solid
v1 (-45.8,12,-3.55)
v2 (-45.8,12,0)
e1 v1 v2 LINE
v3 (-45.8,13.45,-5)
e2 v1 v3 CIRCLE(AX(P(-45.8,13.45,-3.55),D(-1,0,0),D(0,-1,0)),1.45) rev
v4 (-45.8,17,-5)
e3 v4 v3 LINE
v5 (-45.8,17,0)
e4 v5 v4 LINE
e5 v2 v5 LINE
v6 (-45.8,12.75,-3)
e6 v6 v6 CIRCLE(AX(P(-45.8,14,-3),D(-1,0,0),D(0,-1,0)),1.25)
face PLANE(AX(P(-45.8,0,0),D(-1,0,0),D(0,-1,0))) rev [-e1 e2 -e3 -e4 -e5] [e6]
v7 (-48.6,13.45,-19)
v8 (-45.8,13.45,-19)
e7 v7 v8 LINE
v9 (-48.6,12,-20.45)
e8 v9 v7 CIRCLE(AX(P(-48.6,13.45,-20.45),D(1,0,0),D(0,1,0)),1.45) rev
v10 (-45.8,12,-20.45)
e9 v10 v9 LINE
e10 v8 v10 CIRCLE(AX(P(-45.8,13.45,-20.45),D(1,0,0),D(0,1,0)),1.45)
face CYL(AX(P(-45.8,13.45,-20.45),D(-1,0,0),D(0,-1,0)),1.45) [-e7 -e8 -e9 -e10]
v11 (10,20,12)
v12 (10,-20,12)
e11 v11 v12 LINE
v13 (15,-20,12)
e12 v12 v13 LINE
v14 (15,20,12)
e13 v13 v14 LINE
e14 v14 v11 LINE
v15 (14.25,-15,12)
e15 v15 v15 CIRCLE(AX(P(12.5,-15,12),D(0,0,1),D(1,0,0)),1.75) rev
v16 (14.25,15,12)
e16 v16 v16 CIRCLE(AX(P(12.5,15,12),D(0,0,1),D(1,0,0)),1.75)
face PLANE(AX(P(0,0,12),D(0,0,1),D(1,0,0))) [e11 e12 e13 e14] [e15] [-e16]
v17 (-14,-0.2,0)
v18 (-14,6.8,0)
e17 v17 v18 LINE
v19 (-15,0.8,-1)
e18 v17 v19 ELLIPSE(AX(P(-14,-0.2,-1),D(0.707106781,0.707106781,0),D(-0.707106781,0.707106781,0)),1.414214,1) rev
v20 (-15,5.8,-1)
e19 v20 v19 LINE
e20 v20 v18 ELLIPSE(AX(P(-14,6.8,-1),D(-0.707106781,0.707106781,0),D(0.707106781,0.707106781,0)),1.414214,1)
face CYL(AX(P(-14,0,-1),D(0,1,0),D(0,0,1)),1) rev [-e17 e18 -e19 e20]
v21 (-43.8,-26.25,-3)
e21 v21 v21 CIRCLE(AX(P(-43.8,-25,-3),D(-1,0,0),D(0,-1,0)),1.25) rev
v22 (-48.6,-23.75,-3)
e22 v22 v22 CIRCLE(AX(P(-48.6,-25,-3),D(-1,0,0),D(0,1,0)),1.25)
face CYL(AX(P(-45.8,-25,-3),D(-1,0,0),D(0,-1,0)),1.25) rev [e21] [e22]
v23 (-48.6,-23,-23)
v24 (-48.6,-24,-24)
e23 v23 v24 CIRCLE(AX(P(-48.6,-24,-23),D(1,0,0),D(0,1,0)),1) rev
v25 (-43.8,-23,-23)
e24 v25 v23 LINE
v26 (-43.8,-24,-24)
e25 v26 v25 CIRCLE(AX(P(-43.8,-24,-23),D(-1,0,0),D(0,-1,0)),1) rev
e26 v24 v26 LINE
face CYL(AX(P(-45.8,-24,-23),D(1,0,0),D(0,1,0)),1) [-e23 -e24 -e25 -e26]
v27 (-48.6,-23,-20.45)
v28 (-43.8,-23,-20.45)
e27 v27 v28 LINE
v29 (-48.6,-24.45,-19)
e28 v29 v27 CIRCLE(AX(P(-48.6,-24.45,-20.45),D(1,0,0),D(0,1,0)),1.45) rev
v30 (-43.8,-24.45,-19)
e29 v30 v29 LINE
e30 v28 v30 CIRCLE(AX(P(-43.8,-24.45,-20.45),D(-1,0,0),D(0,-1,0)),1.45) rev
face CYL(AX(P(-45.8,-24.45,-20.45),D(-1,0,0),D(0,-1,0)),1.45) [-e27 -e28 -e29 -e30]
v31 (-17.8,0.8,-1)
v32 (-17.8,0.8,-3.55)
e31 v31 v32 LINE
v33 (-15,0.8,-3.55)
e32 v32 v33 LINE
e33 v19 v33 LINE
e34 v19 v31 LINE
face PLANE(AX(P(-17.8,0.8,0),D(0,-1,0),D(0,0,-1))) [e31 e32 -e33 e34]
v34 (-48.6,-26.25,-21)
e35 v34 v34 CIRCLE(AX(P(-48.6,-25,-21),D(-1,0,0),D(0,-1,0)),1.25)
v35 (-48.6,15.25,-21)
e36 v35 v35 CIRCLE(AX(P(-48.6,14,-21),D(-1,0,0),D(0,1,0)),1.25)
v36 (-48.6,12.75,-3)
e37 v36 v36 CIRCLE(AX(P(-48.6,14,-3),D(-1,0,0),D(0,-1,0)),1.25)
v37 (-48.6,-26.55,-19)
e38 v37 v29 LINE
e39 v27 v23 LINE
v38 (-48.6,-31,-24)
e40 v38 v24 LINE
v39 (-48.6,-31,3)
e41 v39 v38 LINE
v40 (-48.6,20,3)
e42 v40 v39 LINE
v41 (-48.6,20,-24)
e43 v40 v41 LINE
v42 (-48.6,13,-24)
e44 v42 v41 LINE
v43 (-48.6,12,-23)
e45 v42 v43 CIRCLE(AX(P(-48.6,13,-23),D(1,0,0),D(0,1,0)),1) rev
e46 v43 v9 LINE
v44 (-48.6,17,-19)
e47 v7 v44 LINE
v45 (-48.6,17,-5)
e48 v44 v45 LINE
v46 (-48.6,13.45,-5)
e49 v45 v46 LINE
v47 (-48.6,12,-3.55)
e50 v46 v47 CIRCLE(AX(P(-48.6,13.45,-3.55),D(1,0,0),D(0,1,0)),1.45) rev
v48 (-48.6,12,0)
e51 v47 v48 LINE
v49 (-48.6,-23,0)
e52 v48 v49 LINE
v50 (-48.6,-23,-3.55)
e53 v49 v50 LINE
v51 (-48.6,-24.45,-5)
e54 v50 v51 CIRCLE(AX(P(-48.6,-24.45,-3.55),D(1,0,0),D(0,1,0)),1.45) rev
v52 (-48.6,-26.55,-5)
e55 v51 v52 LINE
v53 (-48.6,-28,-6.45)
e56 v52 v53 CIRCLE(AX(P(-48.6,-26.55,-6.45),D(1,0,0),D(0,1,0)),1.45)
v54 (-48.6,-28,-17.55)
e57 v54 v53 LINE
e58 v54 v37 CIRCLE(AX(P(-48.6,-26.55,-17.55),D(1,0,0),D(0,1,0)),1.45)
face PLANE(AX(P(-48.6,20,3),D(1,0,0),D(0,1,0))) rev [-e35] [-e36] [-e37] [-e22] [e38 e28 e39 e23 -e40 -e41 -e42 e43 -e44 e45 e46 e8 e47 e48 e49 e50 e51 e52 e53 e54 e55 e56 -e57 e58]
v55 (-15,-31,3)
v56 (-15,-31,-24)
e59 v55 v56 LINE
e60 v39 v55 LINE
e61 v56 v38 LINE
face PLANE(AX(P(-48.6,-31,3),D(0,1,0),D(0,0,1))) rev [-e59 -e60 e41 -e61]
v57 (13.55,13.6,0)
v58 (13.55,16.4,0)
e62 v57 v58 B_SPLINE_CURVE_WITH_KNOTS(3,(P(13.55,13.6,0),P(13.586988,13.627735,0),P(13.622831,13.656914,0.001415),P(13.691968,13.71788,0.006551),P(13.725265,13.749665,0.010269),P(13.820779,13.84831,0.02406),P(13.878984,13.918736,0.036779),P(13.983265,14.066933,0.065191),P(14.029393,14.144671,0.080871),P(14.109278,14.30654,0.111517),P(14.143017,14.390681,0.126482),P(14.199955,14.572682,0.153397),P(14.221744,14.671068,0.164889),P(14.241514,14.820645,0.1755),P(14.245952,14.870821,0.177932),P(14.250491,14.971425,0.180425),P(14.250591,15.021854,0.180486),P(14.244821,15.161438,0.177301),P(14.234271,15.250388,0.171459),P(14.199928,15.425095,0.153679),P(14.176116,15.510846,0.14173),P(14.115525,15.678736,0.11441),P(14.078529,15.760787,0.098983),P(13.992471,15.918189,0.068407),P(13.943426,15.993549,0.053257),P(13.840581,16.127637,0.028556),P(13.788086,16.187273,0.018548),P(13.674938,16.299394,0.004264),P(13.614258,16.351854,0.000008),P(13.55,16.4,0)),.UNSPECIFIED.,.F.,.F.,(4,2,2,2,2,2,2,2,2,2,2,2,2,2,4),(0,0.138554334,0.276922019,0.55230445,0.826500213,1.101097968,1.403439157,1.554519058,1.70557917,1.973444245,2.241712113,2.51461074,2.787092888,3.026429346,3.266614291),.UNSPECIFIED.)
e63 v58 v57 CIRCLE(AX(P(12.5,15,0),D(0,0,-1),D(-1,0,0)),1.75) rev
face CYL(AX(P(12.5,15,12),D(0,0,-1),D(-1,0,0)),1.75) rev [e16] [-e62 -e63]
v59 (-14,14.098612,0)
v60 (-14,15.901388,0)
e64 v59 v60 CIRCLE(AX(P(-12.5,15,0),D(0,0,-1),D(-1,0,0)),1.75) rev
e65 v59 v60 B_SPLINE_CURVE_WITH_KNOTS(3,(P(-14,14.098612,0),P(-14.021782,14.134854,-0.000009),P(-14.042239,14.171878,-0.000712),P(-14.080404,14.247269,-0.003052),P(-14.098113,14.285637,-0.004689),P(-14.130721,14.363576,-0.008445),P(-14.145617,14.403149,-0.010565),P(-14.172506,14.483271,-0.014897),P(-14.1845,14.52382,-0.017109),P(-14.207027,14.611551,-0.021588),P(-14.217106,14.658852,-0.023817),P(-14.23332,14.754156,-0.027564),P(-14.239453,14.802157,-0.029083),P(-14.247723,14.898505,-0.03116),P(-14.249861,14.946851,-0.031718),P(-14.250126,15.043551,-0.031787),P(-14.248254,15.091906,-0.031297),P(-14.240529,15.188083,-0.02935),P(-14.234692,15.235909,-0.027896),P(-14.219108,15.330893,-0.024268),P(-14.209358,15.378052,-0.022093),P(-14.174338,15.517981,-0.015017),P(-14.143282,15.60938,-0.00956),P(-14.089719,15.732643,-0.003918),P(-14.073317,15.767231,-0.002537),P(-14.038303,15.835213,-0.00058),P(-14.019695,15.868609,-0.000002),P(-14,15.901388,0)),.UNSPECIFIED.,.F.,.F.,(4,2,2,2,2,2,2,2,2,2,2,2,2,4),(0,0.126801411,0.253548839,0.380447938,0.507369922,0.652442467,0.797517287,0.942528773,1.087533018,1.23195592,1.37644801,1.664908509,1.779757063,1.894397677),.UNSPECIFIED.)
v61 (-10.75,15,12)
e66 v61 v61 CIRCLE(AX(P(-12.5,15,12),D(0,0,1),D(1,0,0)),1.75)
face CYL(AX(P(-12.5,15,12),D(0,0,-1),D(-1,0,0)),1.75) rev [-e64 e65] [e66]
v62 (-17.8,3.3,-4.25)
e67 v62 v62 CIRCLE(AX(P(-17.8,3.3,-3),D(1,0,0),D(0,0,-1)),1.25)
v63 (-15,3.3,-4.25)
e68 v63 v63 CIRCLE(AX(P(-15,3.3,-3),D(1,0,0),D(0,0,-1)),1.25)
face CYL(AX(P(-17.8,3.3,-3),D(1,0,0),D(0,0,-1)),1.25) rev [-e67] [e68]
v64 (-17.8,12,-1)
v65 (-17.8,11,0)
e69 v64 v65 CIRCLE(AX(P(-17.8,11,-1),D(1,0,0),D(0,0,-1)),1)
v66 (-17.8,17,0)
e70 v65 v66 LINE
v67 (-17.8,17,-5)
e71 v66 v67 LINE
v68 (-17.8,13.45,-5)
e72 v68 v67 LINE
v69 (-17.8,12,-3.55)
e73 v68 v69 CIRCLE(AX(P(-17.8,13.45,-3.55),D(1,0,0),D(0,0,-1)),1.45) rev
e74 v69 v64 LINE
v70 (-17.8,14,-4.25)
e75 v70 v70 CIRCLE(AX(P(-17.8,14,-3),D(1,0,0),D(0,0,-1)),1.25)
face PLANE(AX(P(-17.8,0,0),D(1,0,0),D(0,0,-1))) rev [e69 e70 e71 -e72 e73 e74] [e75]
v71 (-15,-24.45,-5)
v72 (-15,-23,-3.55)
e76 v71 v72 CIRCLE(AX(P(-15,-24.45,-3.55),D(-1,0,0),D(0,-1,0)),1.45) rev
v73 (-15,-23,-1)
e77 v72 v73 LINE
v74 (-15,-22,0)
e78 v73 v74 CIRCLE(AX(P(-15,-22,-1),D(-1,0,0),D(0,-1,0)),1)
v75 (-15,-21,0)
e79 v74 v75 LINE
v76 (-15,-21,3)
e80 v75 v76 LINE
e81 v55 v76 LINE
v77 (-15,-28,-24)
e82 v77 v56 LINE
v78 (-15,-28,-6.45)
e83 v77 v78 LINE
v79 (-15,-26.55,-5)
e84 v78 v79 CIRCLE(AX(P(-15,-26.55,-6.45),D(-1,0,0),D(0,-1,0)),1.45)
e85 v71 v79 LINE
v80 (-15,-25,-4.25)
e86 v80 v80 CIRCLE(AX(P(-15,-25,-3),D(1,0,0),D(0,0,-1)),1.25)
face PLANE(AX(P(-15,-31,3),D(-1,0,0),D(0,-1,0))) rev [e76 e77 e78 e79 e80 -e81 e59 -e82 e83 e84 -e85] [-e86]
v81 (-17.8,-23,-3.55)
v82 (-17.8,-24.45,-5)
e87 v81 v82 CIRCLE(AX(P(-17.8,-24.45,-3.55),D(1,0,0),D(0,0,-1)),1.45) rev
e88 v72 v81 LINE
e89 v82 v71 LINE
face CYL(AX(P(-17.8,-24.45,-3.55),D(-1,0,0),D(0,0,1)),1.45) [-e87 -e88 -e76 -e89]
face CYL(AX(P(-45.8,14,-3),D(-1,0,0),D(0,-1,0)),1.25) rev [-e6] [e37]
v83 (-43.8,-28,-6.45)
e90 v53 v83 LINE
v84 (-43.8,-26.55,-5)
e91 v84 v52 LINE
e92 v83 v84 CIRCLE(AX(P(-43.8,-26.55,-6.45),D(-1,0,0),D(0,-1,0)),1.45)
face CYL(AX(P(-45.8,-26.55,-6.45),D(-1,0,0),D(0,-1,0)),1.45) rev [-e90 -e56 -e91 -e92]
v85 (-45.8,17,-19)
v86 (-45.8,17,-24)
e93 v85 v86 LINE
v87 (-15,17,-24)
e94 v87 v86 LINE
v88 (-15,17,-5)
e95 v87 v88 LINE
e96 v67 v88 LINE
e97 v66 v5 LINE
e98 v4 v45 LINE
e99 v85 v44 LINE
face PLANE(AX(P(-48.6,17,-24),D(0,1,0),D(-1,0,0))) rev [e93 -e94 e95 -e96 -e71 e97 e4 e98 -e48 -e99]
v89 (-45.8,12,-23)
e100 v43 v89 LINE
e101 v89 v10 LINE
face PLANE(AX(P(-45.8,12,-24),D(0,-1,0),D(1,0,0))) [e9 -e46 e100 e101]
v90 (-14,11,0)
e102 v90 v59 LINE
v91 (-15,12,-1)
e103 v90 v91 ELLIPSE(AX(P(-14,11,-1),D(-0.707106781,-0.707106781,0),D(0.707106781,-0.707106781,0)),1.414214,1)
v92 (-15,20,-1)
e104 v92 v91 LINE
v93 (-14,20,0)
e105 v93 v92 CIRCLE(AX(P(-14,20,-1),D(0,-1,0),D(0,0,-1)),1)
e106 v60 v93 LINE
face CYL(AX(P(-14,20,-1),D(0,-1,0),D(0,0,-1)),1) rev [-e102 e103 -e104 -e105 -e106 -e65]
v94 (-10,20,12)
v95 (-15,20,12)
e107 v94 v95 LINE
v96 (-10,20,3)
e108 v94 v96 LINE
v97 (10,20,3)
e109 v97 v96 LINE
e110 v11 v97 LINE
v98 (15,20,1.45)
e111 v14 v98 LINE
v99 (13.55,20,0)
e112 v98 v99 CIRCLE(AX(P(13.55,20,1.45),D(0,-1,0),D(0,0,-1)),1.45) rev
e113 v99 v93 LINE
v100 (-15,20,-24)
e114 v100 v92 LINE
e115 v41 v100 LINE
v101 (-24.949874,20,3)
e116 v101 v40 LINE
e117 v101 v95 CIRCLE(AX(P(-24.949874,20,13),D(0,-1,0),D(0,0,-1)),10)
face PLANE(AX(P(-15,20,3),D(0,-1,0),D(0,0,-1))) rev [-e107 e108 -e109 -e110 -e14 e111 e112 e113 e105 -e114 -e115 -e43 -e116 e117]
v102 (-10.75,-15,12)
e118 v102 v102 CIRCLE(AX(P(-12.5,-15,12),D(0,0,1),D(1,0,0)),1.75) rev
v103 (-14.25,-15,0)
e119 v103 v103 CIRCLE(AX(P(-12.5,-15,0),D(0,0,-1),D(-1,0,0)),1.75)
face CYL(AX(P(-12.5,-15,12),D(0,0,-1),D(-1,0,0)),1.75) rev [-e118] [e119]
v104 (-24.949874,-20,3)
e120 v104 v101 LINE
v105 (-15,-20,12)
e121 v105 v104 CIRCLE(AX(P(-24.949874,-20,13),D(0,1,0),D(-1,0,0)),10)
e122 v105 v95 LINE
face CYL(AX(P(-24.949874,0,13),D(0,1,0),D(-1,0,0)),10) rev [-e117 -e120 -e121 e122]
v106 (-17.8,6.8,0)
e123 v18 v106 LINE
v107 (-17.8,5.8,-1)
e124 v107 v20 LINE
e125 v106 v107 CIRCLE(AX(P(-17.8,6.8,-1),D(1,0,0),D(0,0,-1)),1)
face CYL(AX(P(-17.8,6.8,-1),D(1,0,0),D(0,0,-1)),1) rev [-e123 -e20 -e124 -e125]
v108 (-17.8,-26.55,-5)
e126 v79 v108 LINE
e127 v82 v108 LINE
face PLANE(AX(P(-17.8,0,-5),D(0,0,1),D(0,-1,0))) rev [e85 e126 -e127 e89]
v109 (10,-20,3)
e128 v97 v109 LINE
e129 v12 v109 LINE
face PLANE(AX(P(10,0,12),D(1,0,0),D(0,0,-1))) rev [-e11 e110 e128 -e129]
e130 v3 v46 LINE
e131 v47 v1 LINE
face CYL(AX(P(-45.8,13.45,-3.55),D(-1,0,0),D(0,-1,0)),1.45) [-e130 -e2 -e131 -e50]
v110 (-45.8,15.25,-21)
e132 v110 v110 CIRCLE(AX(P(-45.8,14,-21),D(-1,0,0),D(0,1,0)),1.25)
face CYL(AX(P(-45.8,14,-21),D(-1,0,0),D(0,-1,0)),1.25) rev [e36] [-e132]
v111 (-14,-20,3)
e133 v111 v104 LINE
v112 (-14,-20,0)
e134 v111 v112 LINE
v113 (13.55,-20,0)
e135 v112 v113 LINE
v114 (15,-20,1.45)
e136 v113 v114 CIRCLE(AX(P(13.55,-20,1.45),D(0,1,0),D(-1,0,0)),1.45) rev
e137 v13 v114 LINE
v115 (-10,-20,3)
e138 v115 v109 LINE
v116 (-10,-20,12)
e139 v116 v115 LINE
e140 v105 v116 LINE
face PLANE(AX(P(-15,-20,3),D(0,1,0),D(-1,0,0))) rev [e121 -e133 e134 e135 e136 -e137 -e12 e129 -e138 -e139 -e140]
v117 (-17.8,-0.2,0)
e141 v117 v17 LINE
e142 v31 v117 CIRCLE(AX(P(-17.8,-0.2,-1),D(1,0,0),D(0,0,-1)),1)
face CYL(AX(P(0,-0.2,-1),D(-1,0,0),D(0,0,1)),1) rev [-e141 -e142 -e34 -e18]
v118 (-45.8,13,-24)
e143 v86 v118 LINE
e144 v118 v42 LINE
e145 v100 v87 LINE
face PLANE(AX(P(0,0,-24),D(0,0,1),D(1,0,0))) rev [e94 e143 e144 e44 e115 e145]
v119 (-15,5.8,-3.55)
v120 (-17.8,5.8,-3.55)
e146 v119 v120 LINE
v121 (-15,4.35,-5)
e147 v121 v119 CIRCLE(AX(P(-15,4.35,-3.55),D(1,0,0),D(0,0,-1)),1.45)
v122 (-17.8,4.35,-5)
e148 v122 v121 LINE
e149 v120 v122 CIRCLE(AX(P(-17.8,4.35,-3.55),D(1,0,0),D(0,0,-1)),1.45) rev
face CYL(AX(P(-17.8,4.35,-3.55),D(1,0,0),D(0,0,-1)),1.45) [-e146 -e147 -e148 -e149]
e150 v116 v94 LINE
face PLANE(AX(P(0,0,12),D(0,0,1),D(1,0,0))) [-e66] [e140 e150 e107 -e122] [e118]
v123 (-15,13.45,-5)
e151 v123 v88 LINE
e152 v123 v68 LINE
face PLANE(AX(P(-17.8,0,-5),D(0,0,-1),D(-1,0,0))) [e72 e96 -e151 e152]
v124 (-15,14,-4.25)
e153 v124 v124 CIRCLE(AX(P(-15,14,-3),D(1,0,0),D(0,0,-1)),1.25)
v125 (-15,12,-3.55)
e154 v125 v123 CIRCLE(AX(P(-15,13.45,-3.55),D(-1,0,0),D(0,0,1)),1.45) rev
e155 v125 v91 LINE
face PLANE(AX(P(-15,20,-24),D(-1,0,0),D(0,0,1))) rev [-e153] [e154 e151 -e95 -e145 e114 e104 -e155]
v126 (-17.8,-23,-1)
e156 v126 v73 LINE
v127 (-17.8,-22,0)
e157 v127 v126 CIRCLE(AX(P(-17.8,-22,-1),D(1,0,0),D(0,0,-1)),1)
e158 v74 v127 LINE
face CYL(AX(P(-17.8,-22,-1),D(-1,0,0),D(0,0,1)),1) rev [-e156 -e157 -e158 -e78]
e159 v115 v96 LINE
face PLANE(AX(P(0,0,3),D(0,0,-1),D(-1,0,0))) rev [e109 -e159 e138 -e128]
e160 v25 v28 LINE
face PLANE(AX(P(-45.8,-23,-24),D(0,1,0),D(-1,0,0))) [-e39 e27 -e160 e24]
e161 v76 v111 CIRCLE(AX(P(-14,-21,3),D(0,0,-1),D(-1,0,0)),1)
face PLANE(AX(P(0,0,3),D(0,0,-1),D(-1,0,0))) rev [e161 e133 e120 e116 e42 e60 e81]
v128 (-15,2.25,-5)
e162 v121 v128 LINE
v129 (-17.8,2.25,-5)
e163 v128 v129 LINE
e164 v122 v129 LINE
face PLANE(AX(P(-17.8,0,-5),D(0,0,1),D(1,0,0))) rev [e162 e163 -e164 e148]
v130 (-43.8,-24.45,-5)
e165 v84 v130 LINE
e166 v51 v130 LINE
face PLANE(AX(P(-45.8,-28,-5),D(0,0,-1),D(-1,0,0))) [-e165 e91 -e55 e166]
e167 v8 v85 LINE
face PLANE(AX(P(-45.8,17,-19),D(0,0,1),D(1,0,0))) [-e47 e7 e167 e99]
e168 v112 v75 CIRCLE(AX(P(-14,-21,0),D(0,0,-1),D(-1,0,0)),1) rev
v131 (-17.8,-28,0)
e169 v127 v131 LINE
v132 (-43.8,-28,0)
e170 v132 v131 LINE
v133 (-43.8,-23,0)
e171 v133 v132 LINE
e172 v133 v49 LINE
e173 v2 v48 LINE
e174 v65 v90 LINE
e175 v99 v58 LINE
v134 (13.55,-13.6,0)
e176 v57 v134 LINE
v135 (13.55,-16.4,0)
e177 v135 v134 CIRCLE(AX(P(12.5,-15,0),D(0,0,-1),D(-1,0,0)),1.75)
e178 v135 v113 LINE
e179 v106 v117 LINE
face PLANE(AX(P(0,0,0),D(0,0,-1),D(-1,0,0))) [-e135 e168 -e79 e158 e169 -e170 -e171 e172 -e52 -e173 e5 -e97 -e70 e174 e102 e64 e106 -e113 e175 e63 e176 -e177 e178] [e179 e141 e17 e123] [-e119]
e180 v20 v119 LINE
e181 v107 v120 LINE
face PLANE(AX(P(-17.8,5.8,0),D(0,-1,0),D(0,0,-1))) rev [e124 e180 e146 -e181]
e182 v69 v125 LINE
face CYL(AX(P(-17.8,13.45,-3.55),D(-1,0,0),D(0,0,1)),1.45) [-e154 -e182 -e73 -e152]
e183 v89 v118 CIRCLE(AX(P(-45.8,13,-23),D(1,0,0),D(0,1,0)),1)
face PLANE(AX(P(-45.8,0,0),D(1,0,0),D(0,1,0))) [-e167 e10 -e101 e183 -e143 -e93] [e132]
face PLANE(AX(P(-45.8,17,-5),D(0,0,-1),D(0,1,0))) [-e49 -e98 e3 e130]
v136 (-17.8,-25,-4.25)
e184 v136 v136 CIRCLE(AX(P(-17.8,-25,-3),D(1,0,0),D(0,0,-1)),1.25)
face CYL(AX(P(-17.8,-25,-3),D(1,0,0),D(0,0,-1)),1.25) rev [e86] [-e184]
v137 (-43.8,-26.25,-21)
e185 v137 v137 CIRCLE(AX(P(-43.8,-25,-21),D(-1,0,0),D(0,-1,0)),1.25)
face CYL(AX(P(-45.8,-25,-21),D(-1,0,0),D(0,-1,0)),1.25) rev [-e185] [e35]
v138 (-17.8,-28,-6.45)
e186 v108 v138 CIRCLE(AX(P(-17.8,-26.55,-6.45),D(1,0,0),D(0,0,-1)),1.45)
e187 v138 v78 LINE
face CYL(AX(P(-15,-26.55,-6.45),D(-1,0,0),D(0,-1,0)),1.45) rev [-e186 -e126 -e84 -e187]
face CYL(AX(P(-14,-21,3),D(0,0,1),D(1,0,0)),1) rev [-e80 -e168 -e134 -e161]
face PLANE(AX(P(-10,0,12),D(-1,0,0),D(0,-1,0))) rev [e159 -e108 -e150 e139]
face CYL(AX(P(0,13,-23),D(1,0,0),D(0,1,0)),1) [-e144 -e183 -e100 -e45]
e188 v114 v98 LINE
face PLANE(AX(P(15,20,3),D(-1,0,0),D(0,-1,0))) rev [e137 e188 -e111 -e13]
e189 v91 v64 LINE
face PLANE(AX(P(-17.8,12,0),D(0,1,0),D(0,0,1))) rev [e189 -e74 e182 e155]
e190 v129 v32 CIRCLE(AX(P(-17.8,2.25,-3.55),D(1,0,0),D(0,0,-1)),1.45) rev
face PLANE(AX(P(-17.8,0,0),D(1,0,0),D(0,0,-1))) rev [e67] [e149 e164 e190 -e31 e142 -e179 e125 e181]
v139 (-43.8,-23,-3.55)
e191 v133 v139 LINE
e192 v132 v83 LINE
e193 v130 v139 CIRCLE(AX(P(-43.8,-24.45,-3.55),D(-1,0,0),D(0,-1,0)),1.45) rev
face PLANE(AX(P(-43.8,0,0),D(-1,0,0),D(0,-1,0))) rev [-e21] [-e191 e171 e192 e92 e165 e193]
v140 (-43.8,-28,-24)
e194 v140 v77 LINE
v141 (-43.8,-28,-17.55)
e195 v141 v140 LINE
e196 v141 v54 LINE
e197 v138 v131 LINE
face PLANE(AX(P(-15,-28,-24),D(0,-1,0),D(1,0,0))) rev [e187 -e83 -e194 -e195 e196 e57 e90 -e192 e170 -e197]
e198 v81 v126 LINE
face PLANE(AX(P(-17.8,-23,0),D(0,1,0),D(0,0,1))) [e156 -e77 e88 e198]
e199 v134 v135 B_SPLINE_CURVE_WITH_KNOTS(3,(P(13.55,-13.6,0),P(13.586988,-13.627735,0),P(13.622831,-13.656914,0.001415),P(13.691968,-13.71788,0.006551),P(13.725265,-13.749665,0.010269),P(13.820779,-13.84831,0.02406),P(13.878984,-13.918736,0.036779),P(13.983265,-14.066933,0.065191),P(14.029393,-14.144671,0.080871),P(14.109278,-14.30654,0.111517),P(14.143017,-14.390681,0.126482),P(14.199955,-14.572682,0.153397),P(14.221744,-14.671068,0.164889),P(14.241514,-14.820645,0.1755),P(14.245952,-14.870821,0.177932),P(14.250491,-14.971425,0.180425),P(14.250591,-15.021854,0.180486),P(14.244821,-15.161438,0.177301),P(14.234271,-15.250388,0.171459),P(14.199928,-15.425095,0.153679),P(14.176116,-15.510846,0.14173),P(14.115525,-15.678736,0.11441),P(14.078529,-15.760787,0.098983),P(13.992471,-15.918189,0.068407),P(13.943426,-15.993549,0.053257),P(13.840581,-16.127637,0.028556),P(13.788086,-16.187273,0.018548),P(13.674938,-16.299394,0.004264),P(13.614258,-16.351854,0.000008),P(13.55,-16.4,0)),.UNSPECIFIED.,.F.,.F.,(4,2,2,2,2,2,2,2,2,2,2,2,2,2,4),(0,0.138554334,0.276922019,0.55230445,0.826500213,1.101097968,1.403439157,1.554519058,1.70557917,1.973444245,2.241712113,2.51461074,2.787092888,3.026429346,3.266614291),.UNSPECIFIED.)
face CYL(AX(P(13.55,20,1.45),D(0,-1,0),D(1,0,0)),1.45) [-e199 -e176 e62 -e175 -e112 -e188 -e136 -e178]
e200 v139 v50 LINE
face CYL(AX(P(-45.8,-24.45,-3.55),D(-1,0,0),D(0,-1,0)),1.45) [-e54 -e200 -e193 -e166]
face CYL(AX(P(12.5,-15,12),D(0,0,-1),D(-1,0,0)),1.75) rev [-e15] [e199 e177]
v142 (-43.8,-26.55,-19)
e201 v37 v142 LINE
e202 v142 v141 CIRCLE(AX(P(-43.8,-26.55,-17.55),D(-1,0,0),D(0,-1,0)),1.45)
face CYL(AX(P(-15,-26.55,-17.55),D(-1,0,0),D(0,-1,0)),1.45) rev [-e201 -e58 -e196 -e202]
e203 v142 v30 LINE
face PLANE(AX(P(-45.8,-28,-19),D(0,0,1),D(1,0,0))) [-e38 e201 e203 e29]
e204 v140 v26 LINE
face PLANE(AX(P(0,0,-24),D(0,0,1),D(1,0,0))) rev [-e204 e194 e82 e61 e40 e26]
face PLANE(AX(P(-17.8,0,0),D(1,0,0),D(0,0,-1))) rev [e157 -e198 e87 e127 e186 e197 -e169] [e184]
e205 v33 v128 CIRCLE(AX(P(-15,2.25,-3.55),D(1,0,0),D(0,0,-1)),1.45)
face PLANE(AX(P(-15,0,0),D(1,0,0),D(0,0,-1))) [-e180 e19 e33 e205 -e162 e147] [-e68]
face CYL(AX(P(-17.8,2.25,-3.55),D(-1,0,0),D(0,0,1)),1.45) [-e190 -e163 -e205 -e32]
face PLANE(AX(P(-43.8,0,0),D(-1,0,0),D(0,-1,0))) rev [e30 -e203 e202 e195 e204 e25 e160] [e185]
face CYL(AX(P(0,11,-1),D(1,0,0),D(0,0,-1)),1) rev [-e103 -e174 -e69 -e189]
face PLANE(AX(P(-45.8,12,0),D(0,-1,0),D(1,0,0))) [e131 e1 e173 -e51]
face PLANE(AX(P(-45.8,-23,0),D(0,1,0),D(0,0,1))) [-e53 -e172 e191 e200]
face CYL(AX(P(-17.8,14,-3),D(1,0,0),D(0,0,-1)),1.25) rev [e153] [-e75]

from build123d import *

# Parameters (mm, degrees)
BOSS_EXTRU_1_DEPTH      = 3
ESQUISSE3_W             = 33.6
ESQUISSE3_H             = 3
BOSS_EXTRU_2_DEPTH      = 24
ESQUISSE4_W             = 5
ESQUISSE4_H             = 5
ESQUISSE4_R             = 1.25
BOSS_EXTRU_3_DEPTH      = 2.8
BOSS_EXTRU_4_START      = -2.8
ESQUISSE5_W             = 5
ESQUISSE5_H             = 5
ESQUISSE5_R             = 1.25
BOSS_EXTRU_4_DEPTH      = 2.8
ESQUISSE4_2_W           = 5
ESQUISSE4_2_H           = 5
ESQUISSE4_2_R           = 1.25
BOSS_EXTRU_5_DEPTH      = 4.8
ESQUISSE6_W             = 5
ESQUISSE6_H             = 40
ESQUISSE6_R             = 1.75
BOSS_EXTRU_6_DEPTH      = 9
CONG_3_R                = 10
CONG_4_R                = 1
CONG_1_R                = 1.45
CONG_2_R                = 1
ENL_V_MAT_EXTRU_1_REACH = 65.655
ESQUISSE6_3_R           = 1.75


with BuildPart() as part:
    # Esquisse1 → Boss.-Extru.1 (new body)
    with BuildSketch(Plane.XY):
        Polygon((-15, -20), (15, -20), (15, 20), (-15, 20), (-48.6, 20), (-48.6, -31), (-15, -31), align=None)
    extrude(amount=BOSS_EXTRU_1_DEPTH)

    # Esquisse3 → Boss.-Extru.2 (add)
    with BuildSketch(Plane(origin=(0, 0, 0), x_dir=(-1, 0, 0), z_dir=(0, 0, -1))):
        with Locations((31.8, -29.5)):
            Rectangle(ESQUISSE3_W, ESQUISSE3_H)
        with Locations((31.8, 18.5)):
            Rectangle(ESQUISSE3_W, ESQUISSE3_H)
    extrude(amount=BOSS_EXTRU_2_DEPTH)

    # Esquisse4 → Boss.-Extru.3 (add)
    # profile 1 of 4: a face of its own
    with BuildSketch(Plane.ZY.offset(48.6)):
        with Locations((-21.5, -25.5)):
            Rectangle(ESQUISSE4_W, ESQUISSE4_H)
        with Locations(Location((-21, -25, 0), (0, 0, 270))):
            Circle(ESQUISSE4_R, mode=Mode.SUBTRACT)
    # profile 2 of 4: a face of its own
    with BuildSketch(Plane.ZY.offset(48.6)):
        with Locations((-2.5, -25.5)):
            Rectangle(ESQUISSE4_W, ESQUISSE4_H)
        with Locations(Location((-3, -25, 0), (0, 0, 90))):
            Circle(ESQUISSE4_R, mode=Mode.SUBTRACT)
    # profile 3 of 4: a face of its own
    with BuildSketch(Plane.ZY.offset(48.6)):
        with Locations((-2.5, 14.5)):
            Rectangle(ESQUISSE4_W, ESQUISSE4_H)
        with Locations(Location((-3, 14, 0), (0, 0, 270))):
            Circle(ESQUISSE4_R, mode=Mode.SUBTRACT)
    # profile 4 of 4: a face of its own
    with BuildSketch(Plane.ZY.offset(48.6)):
        with Locations((-21.5, 14.5)):
            Rectangle(ESQUISSE4_W, ESQUISSE4_H)
        with Locations(Location((-21, 14, 0), (0, 0, 90))):
            Circle(ESQUISSE4_R, mode=Mode.SUBTRACT)
    extrude(amount=-BOSS_EXTRU_3_DEPTH)

    # Esquisse5 → Boss.-Extru.4 (add)
    # profile 1 of 3: a face of its own
    with BuildSketch(Plane(origin=(-15, 0, 0), x_dir=(0, 0, -1), z_dir=(1, 0, 0)).offset(BOSS_EXTRU_4_START)):
        with Locations((2.5, -25.5)):
            Rectangle(ESQUISSE5_W, ESQUISSE5_H)
        with Locations(Location((3, -25, 0), (0, 0, 90))):
            Circle(ESQUISSE5_R, mode=Mode.SUBTRACT)
    # profile 2 of 3: a face of its own
    with BuildSketch(Plane(origin=(-15, 0, 0), x_dir=(0, 0, -1), z_dir=(1, 0, 0)).offset(BOSS_EXTRU_4_START)):
        with Locations((2.5, 14.5)):
            Rectangle(ESQUISSE5_W, ESQUISSE5_H)
        with Locations(Location((3, 14, 0), (0, 0, 270))):
            Circle(ESQUISSE5_R, mode=Mode.SUBTRACT)
    # profile 3 of 3: a face of its own
    with BuildSketch(Plane(origin=(-15, 0, 0), x_dir=(0, 0, -1), z_dir=(1, 0, 0)).offset(BOSS_EXTRU_4_START)):
        with Locations((2.5, 3.3)):
            Rectangle(ESQUISSE5_W, ESQUISSE5_H)
        with Locations((3, 3.3)):
            Circle(ESQUISSE5_R, mode=Mode.SUBTRACT)
    extrude(amount=BOSS_EXTRU_4_DEPTH)

    # Esquisse4<2> → Boss.-Extru.5 (add)
    # profile 1 of 2: a face of its own
    with BuildSketch(Plane.ZY.offset(48.6)):
        with Locations((-21.5, -25.5)):
            Rectangle(ESQUISSE4_2_W, ESQUISSE4_2_H)
        with Locations(Location((-21, -25, 0), (0, 0, 270))):
            Circle(ESQUISSE4_2_R, mode=Mode.SUBTRACT)
    # profile 2 of 2: a face of its own
    with BuildSketch(Plane.ZY.offset(48.6)):
        with Locations((-2.5, -25.5)):
            Rectangle(ESQUISSE4_2_W, ESQUISSE4_2_H)
        with Locations(Location((-3, -25, 0), (0, 0, 270))):
            Circle(ESQUISSE4_2_R, mode=Mode.SUBTRACT)
    extrude(amount=-BOSS_EXTRU_5_DEPTH)

    # Esquisse6 → Boss.-Extru.6 (add)
    # profile 1 of 2: a face of its own
    with BuildSketch(Plane.XY.offset(3)):
        with Locations((12.5, 0)):
            Rectangle(ESQUISSE6_W, ESQUISSE6_H)
        with Locations(Location((12.5, -15, 0), (0, 0, 180))):
            Circle(ESQUISSE6_R, mode=Mode.SUBTRACT)
        with Locations((12.5, 15)):
            Circle(ESQUISSE6_R, mode=Mode.SUBTRACT)
    # profile 2 of 2: a face of its own
    with BuildSketch(Plane.XY.offset(3)):
        with Locations((-12.5, 0)):
            Rectangle(ESQUISSE6_W, ESQUISSE6_H)
        with Locations((-12.5, -15)):
            Circle(ESQUISSE6_R, mode=Mode.SUBTRACT)
        with Locations((-12.5, 15)):
            Circle(ESQUISSE6_R, mode=Mode.SUBTRACT)
    extrude(amount=BOSS_EXTRU_6_DEPTH)

    # Congé3
    # the kernel refuses this fillet: 10 mm, written as the material it adds along each edge
    with BuildSketch(Plane(origin=(-15, 20, 3), x_dir=(-1, 0, 0), z_dir=(0, -1, 0))) as cong_3_piece_1:
        with BuildLine():
            CenterArc((9.949874371, -10), CONG_3_R, 90, 84.260829523)
            Line((0, -9), (0, 0))
            Line((0, 0), (9.949874371, 0))
        make_face()
    extrude(amount=40)

    # Congé4
    # the kernel refuses this fillet: 1 mm, written as the material it adds along each edge
    with BuildSketch(Plane(origin=(-15, -20, 0), x_dir=(1, 0, 0), z_dir=(0, 0, 1))) as cong_4_piece_1:
        with BuildLine():
            CenterArc((CONG_4_R, -CONG_4_R), CONG_4_R, 90, 90)
            Line((0, -CONG_4_R), (0, 0))
            Line((0, 0), (CONG_4_R, 0))
        make_face()
    extrude(amount=3)
    with BuildSketch(Plane(origin=(-15, 0.8, 0), x_dir=(1, 0, 0), z_dir=(0, 1, 0))) as cong_4_piece_2:
        with BuildLine():
            CenterArc((CONG_4_R, CONG_4_R), CONG_4_R, 180, 90)
            Line((0, CONG_4_R), (0, 0))
            Line((0, 0), (CONG_4_R, 0))
        make_face()
    extrude(amount=5)
    with BuildSketch(Plane(origin=(-15, 12, 0), x_dir=(1, 0, 0), z_dir=(0, 1, 0))) as cong_4_piece_3:
        with BuildLine():
            CenterArc((CONG_4_R, CONG_4_R), CONG_4_R, 180, 90)
            Line((0, CONG_4_R), (0, 0))
            Line((0, 0), (CONG_4_R, 0))
        make_face()
    extrude(amount=8)

    # Congé1
    cong_1_edges = [part.edges().sort_by_distance(p)[0] for p in [
        (-16.4, 12, -5),
        (-16.4, 5.8, -5),
        (-16.4, 0.8, -5),
        (-16.4, -23, -5),
        (-16.4, -28, -5),
        (-46.2, -23, -19),
        (-46.2, -28, -19),
        (-46.2, -28, -5),
        (-46.2, -23, -5),
        (-47.2, 12, -5),
        (15, 0, 0),
        (-47.2, 12, -19),
    ]]
    fillet(cong_1_edges, radius=CONG_1_R)

    # Congé2
    cong_2_edges = [part.edges().sort_by_distance(p)[0] for p in [
        (-47.2, 12, -24),
        (-16.4, -23, 0),
        (-15.9, 12, 0),
        (-15.9, 0.8, 0),
        (-15.9, 5.8, 0),
        (-46.2, -23, -24),
    ]]
    fillet(cong_2_edges, radius=CONG_2_R)

    # Esquisse6<3> → Enlèv. mat.-Extru.1 (cut, up to next)
    with BuildSketch(Plane.XY.offset(3), mode=Mode.PRIVATE) as enl_v_mat_extru_1_sk1:
        with Locations(Location((-12.5, 15, 0), (0, 0, 211.002719134))):
            Circle(ESQUISSE6_3_R)
    enl_v_mat_extru_1_tool1 = extrude(enl_v_mat_extru_1_sk1.sketch, amount=-ENL_V_MAT_EXTRU_1_REACH, mode=Mode.PRIVATE) & part.part
    # Esquisse6<3> → Enlèv. mat.-Extru.1 (cut, up to next)
    with BuildSketch(Plane.XY.offset(3), mode=Mode.PRIVATE) as enl_v_mat_extru_1_sk2:
        with Locations(Location((-12.5, -15, 0), (0, 0, 180))):
            Circle(ESQUISSE6_3_R)
    enl_v_mat_extru_1_tool2 = extrude(enl_v_mat_extru_1_sk2.sketch, amount=-ENL_V_MAT_EXTRU_1_REACH, mode=Mode.PRIVATE) & part.part
    # Esquisse6<3> → Enlèv. mat.-Extru.1 (cut, up to next)
    with BuildSketch(Plane.XY.offset(3), mode=Mode.PRIVATE) as enl_v_mat_extru_1_sk3:
        with Locations(Location((12.5, -15, 0), (0, 0, 53.130102354))):
            Circle(ESQUISSE6_3_R)
    enl_v_mat_extru_1_tool3 = extrude(enl_v_mat_extru_1_sk3.sketch, amount=-ENL_V_MAT_EXTRU_1_REACH, mode=Mode.PRIVATE) & part.part
    # Esquisse6<3> → Enlèv. mat.-Extru.1 (cut, up to next)
    with BuildSketch(Plane.XY.offset(3), mode=Mode.PRIVATE) as enl_v_mat_extru_1_sk4:
        with Locations(Location((12.5, 15, 0), (0, 0, 306.869897646))):
            Circle(ESQUISSE6_3_R)
    enl_v_mat_extru_1_tool4 = extrude(enl_v_mat_extru_1_sk4.sketch, amount=-ENL_V_MAT_EXTRU_1_REACH, mode=Mode.PRIVATE) & part.part
    add(enl_v_mat_extru_1_tool1.solids().sort_by_distance((-12.5, 15, 3))[0], mode=Mode.SUBTRACT)
    add(enl_v_mat_extru_1_tool2.solids().sort_by_distance((-12.5, -15, 3))[0], mode=Mode.SUBTRACT)
    add(enl_v_mat_extru_1_tool3.solids().sort_by_distance((12.5, -15, 3))[0], mode=Mode.SUBTRACT)
    add(enl_v_mat_extru_1_tool4.solids().sort_by_distance((12.5, 15, 3))[0], mode=Mode.SUBTRACT)


solid = part.part
